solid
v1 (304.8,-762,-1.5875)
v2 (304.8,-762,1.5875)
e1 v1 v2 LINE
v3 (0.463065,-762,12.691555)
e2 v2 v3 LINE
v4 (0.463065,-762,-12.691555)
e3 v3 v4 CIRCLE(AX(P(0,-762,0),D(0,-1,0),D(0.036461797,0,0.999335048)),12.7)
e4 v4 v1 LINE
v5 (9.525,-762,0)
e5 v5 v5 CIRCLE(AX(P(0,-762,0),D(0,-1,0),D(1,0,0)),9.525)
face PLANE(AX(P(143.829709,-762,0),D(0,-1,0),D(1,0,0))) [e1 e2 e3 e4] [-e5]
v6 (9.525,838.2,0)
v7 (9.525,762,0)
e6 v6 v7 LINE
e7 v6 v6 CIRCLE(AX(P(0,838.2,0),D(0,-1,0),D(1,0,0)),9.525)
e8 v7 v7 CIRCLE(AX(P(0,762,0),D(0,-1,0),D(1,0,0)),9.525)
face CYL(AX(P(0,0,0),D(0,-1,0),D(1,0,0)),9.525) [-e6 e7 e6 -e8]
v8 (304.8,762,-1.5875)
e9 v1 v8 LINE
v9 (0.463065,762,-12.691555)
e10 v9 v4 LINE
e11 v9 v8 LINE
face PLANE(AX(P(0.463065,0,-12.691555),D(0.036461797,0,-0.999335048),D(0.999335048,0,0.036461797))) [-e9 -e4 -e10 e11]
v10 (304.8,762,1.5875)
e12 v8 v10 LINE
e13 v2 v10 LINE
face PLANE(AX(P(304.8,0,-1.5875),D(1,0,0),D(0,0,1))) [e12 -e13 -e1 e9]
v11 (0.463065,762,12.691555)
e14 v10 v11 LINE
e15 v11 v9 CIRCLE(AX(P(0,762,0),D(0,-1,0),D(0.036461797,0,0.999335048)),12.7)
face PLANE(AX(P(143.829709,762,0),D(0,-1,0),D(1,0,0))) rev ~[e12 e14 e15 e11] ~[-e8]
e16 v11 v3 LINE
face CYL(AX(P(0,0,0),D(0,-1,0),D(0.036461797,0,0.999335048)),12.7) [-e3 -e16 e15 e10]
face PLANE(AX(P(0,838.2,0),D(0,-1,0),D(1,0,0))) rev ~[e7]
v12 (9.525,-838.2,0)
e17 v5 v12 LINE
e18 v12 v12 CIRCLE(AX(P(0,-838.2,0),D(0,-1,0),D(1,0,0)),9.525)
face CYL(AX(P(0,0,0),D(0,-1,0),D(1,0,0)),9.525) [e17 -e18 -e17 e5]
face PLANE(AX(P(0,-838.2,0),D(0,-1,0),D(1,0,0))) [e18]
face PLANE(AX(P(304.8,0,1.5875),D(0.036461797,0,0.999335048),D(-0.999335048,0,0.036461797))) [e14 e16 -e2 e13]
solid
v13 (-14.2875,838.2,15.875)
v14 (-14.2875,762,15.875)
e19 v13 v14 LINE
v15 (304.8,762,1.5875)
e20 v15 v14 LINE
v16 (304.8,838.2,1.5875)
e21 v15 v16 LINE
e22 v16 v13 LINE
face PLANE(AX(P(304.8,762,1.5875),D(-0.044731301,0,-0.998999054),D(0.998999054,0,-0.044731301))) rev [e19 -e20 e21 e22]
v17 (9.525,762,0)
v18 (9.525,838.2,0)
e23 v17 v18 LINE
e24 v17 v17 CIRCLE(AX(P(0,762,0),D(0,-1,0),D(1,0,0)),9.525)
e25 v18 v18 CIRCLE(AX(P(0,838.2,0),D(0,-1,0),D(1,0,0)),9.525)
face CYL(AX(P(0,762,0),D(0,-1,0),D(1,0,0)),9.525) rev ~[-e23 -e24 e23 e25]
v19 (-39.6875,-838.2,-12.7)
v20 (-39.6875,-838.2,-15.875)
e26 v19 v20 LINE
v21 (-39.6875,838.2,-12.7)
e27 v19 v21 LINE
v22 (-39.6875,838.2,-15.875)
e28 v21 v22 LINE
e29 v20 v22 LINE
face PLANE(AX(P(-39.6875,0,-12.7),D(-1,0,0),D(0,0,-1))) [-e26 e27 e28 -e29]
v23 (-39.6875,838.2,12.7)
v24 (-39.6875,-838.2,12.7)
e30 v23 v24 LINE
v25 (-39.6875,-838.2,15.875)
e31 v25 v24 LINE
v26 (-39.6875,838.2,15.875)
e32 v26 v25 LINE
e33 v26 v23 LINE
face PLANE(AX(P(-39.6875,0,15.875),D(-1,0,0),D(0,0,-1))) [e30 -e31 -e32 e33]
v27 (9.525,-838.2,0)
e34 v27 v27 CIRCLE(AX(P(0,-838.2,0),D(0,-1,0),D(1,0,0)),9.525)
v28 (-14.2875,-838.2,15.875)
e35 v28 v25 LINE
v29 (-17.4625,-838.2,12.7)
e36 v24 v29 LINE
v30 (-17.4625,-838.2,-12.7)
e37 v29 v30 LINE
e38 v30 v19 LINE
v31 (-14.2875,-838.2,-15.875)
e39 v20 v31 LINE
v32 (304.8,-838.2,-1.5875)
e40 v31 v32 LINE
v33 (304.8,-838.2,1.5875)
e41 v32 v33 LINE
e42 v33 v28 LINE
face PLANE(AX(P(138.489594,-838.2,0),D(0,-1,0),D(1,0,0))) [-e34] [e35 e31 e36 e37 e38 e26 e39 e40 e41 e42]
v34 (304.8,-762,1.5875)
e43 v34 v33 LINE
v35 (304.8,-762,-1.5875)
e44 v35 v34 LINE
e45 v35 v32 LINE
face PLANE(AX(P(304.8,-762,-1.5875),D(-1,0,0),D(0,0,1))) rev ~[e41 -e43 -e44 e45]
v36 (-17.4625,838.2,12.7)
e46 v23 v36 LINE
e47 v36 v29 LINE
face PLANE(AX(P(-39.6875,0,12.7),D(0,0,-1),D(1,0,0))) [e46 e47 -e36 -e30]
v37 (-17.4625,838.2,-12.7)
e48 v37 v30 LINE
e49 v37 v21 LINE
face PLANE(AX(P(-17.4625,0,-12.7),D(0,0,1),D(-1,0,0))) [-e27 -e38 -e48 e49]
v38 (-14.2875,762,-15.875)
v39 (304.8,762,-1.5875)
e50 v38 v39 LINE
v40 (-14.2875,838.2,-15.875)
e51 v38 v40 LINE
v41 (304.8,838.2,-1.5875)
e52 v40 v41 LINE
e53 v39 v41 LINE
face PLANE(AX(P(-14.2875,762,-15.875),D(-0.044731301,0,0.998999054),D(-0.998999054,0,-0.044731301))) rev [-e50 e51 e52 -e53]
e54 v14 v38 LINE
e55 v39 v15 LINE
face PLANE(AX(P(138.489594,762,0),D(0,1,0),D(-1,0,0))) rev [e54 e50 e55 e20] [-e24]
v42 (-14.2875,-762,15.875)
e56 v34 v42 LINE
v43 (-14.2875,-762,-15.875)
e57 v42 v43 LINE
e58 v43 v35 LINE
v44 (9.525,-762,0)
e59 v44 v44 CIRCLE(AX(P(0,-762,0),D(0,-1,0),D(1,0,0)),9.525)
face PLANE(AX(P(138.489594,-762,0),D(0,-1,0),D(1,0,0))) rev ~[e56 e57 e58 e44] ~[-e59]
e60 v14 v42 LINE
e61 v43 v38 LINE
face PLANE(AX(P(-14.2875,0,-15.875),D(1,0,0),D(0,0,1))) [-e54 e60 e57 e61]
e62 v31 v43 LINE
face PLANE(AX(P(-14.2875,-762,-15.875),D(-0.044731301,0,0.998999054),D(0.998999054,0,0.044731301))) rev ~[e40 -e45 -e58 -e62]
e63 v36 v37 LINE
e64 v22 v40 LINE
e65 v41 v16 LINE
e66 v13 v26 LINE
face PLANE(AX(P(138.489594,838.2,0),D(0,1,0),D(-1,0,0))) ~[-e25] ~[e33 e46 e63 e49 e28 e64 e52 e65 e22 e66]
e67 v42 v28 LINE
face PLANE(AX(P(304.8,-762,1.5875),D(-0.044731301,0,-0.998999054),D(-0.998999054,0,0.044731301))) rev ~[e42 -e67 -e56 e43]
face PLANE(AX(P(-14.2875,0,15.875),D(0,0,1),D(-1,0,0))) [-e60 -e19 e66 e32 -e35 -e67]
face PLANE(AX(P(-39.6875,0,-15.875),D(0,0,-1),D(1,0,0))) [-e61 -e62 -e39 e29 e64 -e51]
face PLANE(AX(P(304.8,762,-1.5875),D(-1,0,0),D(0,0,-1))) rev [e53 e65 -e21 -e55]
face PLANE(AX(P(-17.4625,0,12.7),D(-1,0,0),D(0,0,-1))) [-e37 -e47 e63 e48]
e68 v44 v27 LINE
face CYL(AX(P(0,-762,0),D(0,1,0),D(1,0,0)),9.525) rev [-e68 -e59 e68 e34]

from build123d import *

# Parameters (mm, degrees)
F0_R     = 9.525
F1_DEPTH = 762
F2_DEPTH = 838.2
F4_DEPTH = 838.2
F5_R     = 9.525
F6_DEPTH = 76.2


# Not quite as in the source:
# - a pattern or mirror of a feature is missing from the dataset's text; its kind, count and spacing are read off the source's solid


with BuildPart() as f1:
    # F0 (on Front) → F1 (new body, symmetric)
    with BuildSketch(Plane.XZ):
        with BuildLine():
            Line((304.8, 1.5875), (0.4630648172, 12.6915551047))
            ThreePointArc((0.4630648172, 12.6915551047), (-12.7, 0), (0.4630648172, -12.6915551047))
            Line((0.4630648172, -12.6915551047), (304.8, -1.5875))
            Line((304.8, -1.5875), (304.8, 1.5875))
        make_face()
        Circle(F0_R, mode=Mode.SUBTRACT)
        Circle(F0_R)
    extrude(amount=F1_DEPTH, both=True)

    # F0 (on Front) → F2 (join, symmetric)
    with BuildSketch(Plane.XZ):
        Circle(F0_R)
    extrude(amount=F2_DEPTH, both=True)


with BuildPart() as f4:
    # F3 (on Front) → F4 (new body, symmetric)
    with BuildSketch(Plane.XZ):
        Polygon((-14.2875, -15.875), (-14.2875, 15.875), (-39.6875, 15.875), (-39.6875, 12.7), (-17.4625, 12.7), (-17.4625, -12.7), (-39.6875, -12.7), (-39.6875, -15.875), align=None)
    extrude(amount=F4_DEPTH, both=True)

    # F5 (on face) → F6 (join)
    with BuildSketch(Plane.XZ.offset(762)):
        Polygon((304.8, -1.5875), (304.8, 1.5875), (-14.2875, 15.875), (-14.2875, -15.875), align=None)
        Circle(F5_R, mode=Mode.SUBTRACT)
    f6 = extrude(amount=F6_DEPTH)

    # F6_copies: F6 across plane
    add(f6.mirror(Plane.ZX))


solid = Compound([f1.part, f4.part])
